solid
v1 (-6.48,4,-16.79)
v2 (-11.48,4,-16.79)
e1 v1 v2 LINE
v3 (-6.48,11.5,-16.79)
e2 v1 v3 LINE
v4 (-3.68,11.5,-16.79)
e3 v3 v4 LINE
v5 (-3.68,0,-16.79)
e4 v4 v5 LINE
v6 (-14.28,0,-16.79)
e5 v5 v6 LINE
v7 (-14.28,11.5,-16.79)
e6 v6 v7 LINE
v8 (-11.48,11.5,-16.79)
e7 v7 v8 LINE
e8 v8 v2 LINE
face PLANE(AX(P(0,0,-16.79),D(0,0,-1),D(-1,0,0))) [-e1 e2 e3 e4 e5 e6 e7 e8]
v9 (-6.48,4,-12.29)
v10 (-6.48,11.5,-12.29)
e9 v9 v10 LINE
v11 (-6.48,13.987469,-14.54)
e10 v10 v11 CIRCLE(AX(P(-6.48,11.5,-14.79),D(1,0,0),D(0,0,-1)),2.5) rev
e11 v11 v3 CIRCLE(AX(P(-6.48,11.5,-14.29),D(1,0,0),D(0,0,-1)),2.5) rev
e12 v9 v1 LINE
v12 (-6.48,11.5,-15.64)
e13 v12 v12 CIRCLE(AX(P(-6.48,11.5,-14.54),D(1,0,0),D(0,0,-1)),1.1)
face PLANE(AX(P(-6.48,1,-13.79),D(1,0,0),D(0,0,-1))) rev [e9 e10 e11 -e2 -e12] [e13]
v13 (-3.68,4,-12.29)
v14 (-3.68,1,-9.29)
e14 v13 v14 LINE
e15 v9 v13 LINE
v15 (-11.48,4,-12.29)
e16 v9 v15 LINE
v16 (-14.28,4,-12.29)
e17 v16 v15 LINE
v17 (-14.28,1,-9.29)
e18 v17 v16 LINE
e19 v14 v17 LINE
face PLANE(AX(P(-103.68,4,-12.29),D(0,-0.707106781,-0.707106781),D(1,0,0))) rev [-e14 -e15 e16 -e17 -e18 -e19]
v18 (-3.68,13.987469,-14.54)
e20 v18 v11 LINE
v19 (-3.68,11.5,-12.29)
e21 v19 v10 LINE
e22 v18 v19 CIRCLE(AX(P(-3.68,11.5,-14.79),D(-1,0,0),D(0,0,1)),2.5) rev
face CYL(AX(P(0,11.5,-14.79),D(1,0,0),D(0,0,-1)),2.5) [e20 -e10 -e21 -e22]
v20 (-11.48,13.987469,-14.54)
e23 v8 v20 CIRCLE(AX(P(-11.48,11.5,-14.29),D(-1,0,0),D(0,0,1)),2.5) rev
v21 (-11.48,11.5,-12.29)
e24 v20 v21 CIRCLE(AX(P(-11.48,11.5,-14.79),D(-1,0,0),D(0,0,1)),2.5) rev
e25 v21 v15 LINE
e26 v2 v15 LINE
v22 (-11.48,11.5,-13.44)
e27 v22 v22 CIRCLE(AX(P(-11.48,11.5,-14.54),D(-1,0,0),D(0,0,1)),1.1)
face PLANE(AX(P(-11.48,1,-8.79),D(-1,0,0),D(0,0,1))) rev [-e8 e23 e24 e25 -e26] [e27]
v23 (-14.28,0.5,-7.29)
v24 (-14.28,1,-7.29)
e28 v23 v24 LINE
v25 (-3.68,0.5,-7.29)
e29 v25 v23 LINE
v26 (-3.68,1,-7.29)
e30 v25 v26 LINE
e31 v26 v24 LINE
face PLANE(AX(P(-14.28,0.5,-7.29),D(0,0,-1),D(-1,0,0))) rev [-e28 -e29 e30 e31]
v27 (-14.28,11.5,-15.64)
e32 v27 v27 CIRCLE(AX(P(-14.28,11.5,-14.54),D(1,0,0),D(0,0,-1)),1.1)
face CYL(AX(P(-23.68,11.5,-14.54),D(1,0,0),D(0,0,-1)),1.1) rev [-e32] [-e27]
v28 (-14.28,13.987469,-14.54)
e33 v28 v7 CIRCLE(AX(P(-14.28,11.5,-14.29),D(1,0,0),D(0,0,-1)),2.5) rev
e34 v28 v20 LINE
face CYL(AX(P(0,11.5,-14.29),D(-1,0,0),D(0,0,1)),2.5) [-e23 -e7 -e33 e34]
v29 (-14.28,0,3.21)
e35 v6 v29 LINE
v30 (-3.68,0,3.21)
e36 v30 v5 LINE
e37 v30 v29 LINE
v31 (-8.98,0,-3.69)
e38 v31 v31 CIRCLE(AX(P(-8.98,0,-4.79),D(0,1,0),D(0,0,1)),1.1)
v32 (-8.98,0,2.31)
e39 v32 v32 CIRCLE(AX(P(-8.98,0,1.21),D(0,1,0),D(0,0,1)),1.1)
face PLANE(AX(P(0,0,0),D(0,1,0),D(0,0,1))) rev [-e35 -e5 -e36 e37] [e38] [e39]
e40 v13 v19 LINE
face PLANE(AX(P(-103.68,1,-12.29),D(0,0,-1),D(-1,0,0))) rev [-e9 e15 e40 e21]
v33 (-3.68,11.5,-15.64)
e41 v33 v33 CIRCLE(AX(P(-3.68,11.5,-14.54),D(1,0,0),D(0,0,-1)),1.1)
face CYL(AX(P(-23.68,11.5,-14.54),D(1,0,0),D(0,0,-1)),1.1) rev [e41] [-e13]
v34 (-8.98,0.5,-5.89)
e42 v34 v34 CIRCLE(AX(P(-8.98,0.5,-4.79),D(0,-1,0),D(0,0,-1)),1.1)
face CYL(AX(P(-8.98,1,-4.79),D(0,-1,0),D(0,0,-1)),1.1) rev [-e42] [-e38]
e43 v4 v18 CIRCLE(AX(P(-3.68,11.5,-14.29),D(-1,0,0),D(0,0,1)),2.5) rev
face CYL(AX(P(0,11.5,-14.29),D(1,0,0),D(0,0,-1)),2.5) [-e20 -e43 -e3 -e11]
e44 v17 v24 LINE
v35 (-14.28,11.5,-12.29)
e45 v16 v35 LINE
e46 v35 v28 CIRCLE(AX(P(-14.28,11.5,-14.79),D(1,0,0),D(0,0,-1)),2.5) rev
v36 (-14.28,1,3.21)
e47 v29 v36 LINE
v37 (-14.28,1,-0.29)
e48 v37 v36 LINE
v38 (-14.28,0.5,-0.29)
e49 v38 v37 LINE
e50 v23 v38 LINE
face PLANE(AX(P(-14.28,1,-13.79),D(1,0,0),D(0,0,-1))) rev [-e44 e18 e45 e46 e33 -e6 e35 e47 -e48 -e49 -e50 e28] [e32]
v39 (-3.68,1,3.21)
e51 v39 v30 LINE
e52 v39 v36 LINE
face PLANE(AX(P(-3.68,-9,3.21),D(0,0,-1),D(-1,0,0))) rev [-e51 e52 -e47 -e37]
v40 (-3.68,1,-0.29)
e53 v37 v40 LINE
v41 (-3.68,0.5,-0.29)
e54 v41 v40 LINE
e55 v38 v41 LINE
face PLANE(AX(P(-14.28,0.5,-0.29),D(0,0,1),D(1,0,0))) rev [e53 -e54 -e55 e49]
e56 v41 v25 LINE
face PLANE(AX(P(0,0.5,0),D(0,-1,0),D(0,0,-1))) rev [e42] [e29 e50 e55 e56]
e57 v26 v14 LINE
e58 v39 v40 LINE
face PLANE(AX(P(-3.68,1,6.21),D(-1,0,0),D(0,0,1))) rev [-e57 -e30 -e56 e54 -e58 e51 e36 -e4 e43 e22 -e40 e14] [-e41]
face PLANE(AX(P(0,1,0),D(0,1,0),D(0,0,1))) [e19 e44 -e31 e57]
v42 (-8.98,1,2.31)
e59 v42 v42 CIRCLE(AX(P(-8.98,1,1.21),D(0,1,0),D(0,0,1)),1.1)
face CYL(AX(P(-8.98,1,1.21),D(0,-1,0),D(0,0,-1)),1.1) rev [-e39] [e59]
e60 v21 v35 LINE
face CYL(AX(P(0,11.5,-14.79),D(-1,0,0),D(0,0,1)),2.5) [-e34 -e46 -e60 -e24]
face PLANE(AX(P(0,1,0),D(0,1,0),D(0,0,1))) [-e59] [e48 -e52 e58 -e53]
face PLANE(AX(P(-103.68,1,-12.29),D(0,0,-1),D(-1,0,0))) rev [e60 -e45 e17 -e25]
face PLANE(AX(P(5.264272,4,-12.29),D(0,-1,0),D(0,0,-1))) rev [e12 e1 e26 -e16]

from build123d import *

# Parameters (mm, degrees)
SKETCH1_R           = 1.1
BOSS_EXTRUDE1_DEPTH = 1
SKETCH2_W           = 2.8
SKETCH2_H           = 5
BOSS_EXTRUDE2_DEPTH = 8
SKETCH4_W           = 2.8
SKETCH4_H           = 9
BOSS_EXTRUDE3_DEPTH = 3
SKETCH5_R           = 1.1
CUT_EXTRUDE2_DEPTH  = 100
SKETCH6_W           = 2.8
SKETCH6_H           = 8
BOSS_EXTRUDE4_DEPTH = 1
SKETCH7_W           = 3.5
SKETCH7_H           = 9
CUT_EXTRUDE3_DEPTH  = 100
CHAMFER2_SIZE       = 3
SKETCH8_W           = 10.6
SKETCH8_H           = 3
CUT_EXTRUDE4_DEPTH  = 10
BOSS_EXTRUDE5_DEPTH = 7.8
SKETCH10_W          = 10.6
SKETCH10_H          = 7
CUT_EXTRUDE5_DEPTH  = 0.5
SKETCH11_W          = 2.8
SKETCH11_H          = 4.5
BOSS_EXTRUDE6_DEPTH = 4
SKETCH12_R          = 1.1
BOSS_EXTRUDE7_DEPTH = 10.6
SKETCH13_W          = 5
SKETCH13_H          = 4.5
CUT_EXTRUDE6_DEPTH  = 10
SKETCH14_R          = 1.1
CUT_EXTRUDE7_DEPTH  = 20
FILLET1_R           = 2.5


with BuildPart() as part:
    # Sketch1 → Boss-Extrude1 (new body)
    with BuildSketch(Plane(origin=(0, 0, 0), x_dir=(1, 0, 0), z_dir=(0, 1, 0))):
        Polygon((-14.28, 13.79), (-14.28, -6.21), (-3.68, -6.21), (-3.68, 13.79), (-6.48, 13.79), (-6.48, 8.79), (-11.48, 8.79), (-11.48, 13.79), align=None)
        with Locations(Location((-8.98, 4.79, 0), (0, 0, 270))):
            Circle(SKETCH1_R, mode=Mode.SUBTRACT)
        with Locations(Location((-8.98, -1.21, 0), (0, 0, 270))):
            Circle(SKETCH1_R, mode=Mode.SUBTRACT)
    extrude(amount=BOSS_EXTRUDE1_DEPTH)

    # Sketch2 → Boss-Extrude2 (add)
    with BuildSketch(Plane(origin=(0, 1, 0), x_dir=(1, 0, 0), z_dir=(0, 1, 0))):
        with Locations((-12.88, 11.29)):
            Rectangle(SKETCH2_W, SKETCH2_H)
        with Locations((-5.08, 11.29)):
            Rectangle(SKETCH2_W, SKETCH2_H)
    extrude(amount=BOSS_EXTRUDE2_DEPTH)

    # Sketch4 → Boss-Extrude3 (add)
    with BuildSketch(Plane(origin=(0, 0, -13.79), x_dir=(-1, 0, 0), z_dir=(0, 0, -1))):
        with Locations((5.08, 4.5)):
            Rectangle(SKETCH4_W, SKETCH4_H)
        with Locations((12.88, 4.5)):
            Rectangle(SKETCH4_W, SKETCH4_H)
    extrude(amount=BOSS_EXTRUDE3_DEPTH)

    # Sketch5 → Cut-Extrude2 (cut)
    with BuildSketch(Plane(origin=(-3.68, 0, 0), x_dir=(0, 0, -1), z_dir=(1, 0, 0))):
        with Locations((14.29, 7.5)):
            Circle(SKETCH5_R)
    extrude(amount=-CUT_EXTRUDE2_DEPTH, mode=Mode.SUBTRACT)

    # Sketch6 → Boss-Extrude4 (add)
    with BuildSketch(Plane(origin=(0, 9, 0), x_dir=(1, 0, 0), z_dir=(0, 1, 0))):
        with Locations((-12.88, 12.79)):
            Rectangle(SKETCH6_W, SKETCH6_H)
        with Locations((-5.08, 12.79)):
            Rectangle(SKETCH6_W, SKETCH6_H)
    extrude(amount=BOSS_EXTRUDE4_DEPTH)

    # Sketch7 → Cut-Extrude3 (cut)
    with BuildSketch(Plane(origin=(-3.68, 0, 0), x_dir=(0, 0, -1), z_dir=(1, 0, 0))):
        with Locations((10.54, 5.5)):
            Rectangle(SKETCH7_W, SKETCH7_H)
    extrude(amount=-CUT_EXTRUDE3_DEPTH, mode=Mode.SUBTRACT)

    # Chamfer2
    chamfer2_edges = [part.edges().sort_by_distance(p)[0] for p in [
        (-5.08, 1, -12.29),
        (-12.88, 1, -12.29),
    ]]
    chamfer(chamfer2_edges, length=CHAMFER2_SIZE)

    # Sketch8 → Cut-Extrude4 (cut)
    with BuildSketch(Plane(origin=(0, 1, 0), x_dir=(1, 0, 0), z_dir=(0, 1, 0))):
        with Locations((-8.98, -4.71)):
            Rectangle(SKETCH8_W, SKETCH8_H)
    extrude(amount=-CUT_EXTRUDE4_DEPTH, mode=Mode.SUBTRACT)

    # Sketch9 → Boss-Extrude5 (add)
    with BuildSketch(Plane(origin=(-11.48, 0, 0), x_dir=(0, 0, -1), z_dir=(1, 0, 0))):
        Polygon((8.79, 1), (9.29, 1), (12.29, 4), (16.79, 4), (16.79, 0), (8.79, 0), align=None)
    extrude(amount=BOSS_EXTRUDE5_DEPTH)

    # Sketch10 → Cut-Extrude5 (cut)
    with BuildSketch(Plane(origin=(0, 1, 0), x_dir=(1, 0, 0), z_dir=(0, 1, 0))):
        with Locations((-8.98, 3.79)):
            Rectangle(SKETCH10_W, SKETCH10_H)
    extrude(amount=-CUT_EXTRUDE5_DEPTH, mode=Mode.SUBTRACT)

    # Sketch11 → Boss-Extrude6 (add)
    with BuildSketch(Plane(origin=(0, 10, 0), x_dir=(1, 0, 0), z_dir=(0, 1, 0))):
        with Locations((-12.88, 14.54)):
            Rectangle(SKETCH11_W, SKETCH11_H)
        with Locations((-5.08, 14.54)):
            Rectangle(SKETCH11_W, SKETCH11_H)
    extrude(amount=BOSS_EXTRUDE6_DEPTH)

    # Sketch12 → Boss-Extrude7 (add)
    with BuildSketch(Plane(origin=(-3.68, 0, 0), x_dir=(0, 0, -1), z_dir=(1, 0, 0))):
        with Locations((14.29, 7.5)):
            Circle(SKETCH12_R)
    extrude(amount=-BOSS_EXTRUDE7_DEPTH)

    # Sketch13 → Cut-Extrude6 (cut)
    with BuildSketch(Plane(origin=(0, 14, 0), x_dir=(1, 0, 0), z_dir=(0, 1, 0))):
        with Locations((-8.98, 14.54)):
            Rectangle(SKETCH13_W, SKETCH13_H)
    extrude(amount=-CUT_EXTRUDE6_DEPTH, mode=Mode.SUBTRACT)

    # Sketch14 → Cut-Extrude7 (cut)
    with BuildSketch(Plane(origin=(-3.68, 0, 0), x_dir=(0, 0, -1), z_dir=(1, 0, 0))):
        with Locations((14.54, 11.5)):
            Circle(SKETCH14_R)
    extrude(amount=-CUT_EXTRUDE7_DEPTH, mode=Mode.SUBTRACT)

    # Fillet1
    # the kernel refuses this fillet: 2.5 mm, written as the material it takes off along each edge
    with BuildSketch(Plane(origin=(-20.53, 14, -16.79), x_dir=(0, 0, 1), z_dir=(1, 0, 0)), Plane(origin=(-12.73, 14, -12.29), x_dir=(0, -1, 0), z_dir=(1, 0, 0)), Plane(origin=(2.57, 14, -16.79), x_dir=(0, -1, 0), z_dir=(-1, 0, 0))) as fillet1_piece_1:
        with BuildLine():
            CenterArc((FILLET1_R, FILLET1_R), FILLET1_R, 180, 90)
            Line((0, FILLET1_R), (0, 0))
            Line((0, 0), (FILLET1_R, 0))
        make_face()
    extrude(amount=15.3, mode=Mode.SUBTRACT)
    with BuildSketch(Plane(origin=(-5.23, 14, -12.29), x_dir=(0, -1, 0), z_dir=(-1, 0, 0))) as fillet1_piece_2:
        with BuildLine():
            CenterArc((FILLET1_R, -FILLET1_R), FILLET1_R, 90, 90)
            Line((0, -FILLET1_R), (0, 0))
            Line((0, 0), (FILLET1_R, 0))
        make_face()
    extrude(amount=15.3, mode=Mode.SUBTRACT)


solid = part.part
